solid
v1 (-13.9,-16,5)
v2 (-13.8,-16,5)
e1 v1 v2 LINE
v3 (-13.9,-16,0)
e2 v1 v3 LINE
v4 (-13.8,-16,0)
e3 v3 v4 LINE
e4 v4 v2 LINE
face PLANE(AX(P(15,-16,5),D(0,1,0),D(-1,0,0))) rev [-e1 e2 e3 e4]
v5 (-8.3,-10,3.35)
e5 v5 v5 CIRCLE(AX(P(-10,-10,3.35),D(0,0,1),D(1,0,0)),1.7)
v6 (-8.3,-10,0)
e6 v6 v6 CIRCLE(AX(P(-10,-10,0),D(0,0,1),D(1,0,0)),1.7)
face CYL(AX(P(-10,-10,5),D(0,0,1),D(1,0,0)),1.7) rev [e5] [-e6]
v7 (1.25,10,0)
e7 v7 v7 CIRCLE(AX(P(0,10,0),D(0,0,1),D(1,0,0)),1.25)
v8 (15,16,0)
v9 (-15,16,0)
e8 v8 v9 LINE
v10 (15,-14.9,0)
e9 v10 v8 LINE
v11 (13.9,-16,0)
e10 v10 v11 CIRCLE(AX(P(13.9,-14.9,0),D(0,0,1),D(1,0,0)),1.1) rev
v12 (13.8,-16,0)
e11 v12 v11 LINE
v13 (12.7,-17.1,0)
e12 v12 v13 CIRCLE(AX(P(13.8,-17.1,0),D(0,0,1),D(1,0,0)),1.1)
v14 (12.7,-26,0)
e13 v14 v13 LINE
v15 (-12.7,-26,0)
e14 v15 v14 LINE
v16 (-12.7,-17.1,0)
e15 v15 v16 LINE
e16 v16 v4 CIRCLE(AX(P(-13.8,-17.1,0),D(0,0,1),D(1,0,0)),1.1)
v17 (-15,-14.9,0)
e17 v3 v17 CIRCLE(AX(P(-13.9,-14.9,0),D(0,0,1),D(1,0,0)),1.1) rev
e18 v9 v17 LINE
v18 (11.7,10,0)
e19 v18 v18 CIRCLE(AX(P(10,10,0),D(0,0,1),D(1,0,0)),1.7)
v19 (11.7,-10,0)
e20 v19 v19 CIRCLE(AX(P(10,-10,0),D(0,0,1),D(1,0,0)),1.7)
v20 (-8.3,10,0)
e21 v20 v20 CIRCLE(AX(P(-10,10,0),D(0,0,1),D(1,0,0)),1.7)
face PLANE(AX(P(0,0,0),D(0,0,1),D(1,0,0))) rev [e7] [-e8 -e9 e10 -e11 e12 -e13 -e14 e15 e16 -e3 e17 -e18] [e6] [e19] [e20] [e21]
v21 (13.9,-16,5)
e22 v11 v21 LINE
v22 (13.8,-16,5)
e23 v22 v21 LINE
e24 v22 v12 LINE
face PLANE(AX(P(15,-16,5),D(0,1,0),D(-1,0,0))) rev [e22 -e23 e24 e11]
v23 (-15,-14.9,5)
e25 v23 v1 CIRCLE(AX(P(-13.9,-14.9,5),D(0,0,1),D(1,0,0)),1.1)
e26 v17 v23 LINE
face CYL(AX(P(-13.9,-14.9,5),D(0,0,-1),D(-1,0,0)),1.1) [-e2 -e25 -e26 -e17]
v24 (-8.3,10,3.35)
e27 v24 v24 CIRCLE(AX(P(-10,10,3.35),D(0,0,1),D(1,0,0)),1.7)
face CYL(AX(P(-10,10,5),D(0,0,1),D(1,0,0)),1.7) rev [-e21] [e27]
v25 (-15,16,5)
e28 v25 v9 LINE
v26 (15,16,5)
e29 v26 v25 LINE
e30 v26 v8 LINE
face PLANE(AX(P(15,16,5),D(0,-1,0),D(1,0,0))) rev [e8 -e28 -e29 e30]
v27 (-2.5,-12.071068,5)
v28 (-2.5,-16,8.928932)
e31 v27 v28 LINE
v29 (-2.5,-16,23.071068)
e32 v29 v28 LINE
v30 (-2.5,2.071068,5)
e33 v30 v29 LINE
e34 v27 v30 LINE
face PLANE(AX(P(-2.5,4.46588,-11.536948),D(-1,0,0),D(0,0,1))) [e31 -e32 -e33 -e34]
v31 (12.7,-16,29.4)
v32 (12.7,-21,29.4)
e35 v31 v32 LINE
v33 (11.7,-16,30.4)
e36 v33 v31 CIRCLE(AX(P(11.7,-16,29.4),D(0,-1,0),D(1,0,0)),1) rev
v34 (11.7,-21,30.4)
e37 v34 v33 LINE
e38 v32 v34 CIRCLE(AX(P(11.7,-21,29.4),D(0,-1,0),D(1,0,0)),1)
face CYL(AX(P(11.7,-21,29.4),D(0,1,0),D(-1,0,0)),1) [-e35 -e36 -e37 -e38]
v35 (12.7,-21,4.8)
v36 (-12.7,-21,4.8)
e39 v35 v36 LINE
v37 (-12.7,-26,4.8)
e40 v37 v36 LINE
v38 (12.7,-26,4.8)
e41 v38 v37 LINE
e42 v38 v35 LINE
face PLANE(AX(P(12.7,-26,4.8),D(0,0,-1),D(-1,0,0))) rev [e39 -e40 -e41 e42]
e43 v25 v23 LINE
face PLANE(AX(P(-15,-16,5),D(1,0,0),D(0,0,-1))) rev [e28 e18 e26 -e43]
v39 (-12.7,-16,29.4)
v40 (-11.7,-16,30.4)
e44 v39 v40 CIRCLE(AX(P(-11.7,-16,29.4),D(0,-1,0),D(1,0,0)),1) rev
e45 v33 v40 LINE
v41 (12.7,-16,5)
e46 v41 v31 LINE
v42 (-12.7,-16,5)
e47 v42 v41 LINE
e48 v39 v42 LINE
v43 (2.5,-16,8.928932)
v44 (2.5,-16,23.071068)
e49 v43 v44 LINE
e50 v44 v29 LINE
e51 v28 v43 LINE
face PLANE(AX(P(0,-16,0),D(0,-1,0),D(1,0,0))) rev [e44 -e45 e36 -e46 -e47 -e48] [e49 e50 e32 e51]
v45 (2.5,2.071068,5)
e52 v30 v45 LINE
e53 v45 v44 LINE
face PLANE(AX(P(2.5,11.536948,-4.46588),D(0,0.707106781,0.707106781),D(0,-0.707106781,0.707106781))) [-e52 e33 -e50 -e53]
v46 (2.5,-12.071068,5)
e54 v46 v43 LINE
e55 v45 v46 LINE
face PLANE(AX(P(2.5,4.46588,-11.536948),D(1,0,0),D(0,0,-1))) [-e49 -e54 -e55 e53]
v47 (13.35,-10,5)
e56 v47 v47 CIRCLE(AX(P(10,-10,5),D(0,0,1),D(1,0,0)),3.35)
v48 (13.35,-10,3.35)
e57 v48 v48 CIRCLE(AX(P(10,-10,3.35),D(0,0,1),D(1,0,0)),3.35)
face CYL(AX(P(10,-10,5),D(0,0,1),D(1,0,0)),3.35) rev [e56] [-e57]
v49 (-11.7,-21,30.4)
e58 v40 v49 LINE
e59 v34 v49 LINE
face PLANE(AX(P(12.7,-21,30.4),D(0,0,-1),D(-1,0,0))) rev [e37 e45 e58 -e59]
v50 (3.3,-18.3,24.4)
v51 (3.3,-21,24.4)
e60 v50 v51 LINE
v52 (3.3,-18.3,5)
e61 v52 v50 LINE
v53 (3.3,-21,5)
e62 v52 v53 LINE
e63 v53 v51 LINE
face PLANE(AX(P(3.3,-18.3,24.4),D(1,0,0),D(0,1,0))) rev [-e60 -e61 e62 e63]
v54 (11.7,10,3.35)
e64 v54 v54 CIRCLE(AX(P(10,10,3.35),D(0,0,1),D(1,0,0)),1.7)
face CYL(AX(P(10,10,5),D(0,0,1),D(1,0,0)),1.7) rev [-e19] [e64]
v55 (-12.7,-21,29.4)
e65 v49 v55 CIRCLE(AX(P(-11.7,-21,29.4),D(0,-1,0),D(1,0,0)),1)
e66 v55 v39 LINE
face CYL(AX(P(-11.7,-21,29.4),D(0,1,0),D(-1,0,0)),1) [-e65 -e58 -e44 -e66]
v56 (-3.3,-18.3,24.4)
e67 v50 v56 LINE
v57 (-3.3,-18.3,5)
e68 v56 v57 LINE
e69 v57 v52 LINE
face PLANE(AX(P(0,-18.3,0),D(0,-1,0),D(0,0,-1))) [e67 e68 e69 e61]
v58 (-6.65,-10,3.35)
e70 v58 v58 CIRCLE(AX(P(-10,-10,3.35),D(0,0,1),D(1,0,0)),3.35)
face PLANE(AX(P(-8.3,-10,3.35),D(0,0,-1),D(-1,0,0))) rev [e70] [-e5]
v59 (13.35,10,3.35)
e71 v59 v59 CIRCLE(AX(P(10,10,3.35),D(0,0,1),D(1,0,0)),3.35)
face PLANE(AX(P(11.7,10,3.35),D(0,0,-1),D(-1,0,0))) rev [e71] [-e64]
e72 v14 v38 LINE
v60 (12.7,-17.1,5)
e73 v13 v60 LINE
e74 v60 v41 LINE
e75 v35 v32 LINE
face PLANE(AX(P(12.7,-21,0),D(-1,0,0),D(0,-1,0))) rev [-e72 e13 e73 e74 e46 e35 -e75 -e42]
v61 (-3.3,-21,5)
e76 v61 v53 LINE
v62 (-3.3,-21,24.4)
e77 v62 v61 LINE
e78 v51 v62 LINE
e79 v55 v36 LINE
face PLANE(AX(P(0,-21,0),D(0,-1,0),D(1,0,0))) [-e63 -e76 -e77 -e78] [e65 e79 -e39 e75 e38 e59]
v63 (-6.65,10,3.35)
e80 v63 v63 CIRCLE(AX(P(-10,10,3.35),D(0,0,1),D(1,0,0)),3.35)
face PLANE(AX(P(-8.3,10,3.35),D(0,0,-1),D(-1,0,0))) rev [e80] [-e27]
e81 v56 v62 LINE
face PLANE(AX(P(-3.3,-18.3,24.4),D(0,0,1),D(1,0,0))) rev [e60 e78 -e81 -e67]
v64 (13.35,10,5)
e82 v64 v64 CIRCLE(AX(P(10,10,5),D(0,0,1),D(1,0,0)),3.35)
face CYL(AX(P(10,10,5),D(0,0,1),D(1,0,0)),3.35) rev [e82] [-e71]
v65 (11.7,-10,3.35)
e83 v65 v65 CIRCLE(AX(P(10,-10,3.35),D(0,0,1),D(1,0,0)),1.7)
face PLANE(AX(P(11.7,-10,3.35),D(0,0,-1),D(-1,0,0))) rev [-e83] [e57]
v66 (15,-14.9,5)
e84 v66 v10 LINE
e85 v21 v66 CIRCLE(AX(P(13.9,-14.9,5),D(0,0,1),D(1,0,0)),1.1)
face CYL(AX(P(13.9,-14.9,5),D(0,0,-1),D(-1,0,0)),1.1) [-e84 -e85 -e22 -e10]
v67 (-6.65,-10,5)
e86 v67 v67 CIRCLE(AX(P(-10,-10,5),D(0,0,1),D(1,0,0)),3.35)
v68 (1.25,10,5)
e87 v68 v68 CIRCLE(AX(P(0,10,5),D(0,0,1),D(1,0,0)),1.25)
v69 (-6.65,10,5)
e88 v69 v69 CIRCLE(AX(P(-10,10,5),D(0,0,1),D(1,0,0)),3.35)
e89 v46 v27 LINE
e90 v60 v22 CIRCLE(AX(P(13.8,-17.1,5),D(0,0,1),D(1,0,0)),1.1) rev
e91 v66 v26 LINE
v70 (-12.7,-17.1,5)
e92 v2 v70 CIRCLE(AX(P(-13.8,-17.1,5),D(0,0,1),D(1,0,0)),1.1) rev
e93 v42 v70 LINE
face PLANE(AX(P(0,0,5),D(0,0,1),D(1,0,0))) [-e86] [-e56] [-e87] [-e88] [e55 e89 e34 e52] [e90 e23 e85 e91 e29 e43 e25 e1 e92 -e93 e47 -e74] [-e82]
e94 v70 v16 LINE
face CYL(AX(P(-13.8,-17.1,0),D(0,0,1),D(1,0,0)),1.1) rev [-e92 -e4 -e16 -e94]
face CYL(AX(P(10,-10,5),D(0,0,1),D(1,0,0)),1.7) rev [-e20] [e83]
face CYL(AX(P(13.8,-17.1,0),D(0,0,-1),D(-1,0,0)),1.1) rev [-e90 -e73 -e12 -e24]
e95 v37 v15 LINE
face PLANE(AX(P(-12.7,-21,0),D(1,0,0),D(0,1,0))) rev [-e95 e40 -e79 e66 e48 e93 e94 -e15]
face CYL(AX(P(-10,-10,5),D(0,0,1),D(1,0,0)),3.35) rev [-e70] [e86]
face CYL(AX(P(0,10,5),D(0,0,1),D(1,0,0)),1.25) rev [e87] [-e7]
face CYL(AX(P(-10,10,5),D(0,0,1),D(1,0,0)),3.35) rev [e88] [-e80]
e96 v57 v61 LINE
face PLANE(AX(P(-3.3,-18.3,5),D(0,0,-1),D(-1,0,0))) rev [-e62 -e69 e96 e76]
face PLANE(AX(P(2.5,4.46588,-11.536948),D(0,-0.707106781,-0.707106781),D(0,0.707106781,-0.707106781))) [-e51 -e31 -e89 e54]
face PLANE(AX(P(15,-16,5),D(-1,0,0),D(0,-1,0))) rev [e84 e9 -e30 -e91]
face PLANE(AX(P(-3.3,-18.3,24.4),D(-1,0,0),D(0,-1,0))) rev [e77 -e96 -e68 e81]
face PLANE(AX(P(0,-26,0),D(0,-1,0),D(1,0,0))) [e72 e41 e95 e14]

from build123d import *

# Parameters (mm, degrees)
SKETCH1_W                       = 30
SKETCH1_H                       = 32
BOSS_EXTRUDE1_DEPTH             = 5
CBORE_FOR_M3_SBHCS2_D           = 3.4
CBORE_FOR_M3_SBHCS2_CBORE_D     = 6.7
CBORE_FOR_M3_SBHCS2_CBORE_DEPTH = 1.65
TAP_DRILL_FOR_M3X0_5_TAP1_D     = 2.5
SKETCH5_W                       = 25.4
SKETCH5_H                       = 30.4
BOSS_EXTRUDE2_DEPTH             = 5
BOSS_EXTRUDE3_REACH             = 38.377
SKETCH8_W                       = 5
SKETCH8_H                       = 10
BOSS_EXTRUDE3_DIRECTION_2_REACH = 38.377
SKETCH10_W                      = 6.6
SKETCH10_H                      = 19.4
CUT_EXTRUDE1_DEPTH              = 2.7
FILLET1_R                       = 1
SKETCH12_W                      = 25.4
SKETCH12_H                      = 4.8
BOSS_EXTRUDE5_DEPTH             = 5
FILLET2_START                   = -1
FILLET2_DEPTH                   = 30.4
FILLET2_2_DEPTH                 = 5


with BuildPart() as part:
    # Sketch1 → Boss-Extrude1 (new body)
    with BuildSketch(Plane.XY):
        Rectangle(SKETCH1_W, SKETCH1_H)
    extrude(amount=BOSS_EXTRUDE1_DEPTH)

    # CBORE for M3 SBHCS2 (through all)
    with Locations(Plane.XY.offset(5)):
        with Locations((-10, 10), (-10, -10), (10, -10), (10, 10)):
            CounterBoreHole(CBORE_FOR_M3_SBHCS2_D / 2, CBORE_FOR_M3_SBHCS2_CBORE_D / 2, CBORE_FOR_M3_SBHCS2_CBORE_DEPTH)

    # Tap Drill for M3x0.5 Tap1 (through all)
    with Locations(Plane.XY.offset(5)):
        with Locations((0, 10)):
            Hole(TAP_DRILL_FOR_M3X0_5_TAP1_D / 2)

    # Sketch5 → Boss-Extrude2 (add)
    with BuildSketch(Plane.XZ.offset(16)):
        with Locations((0, 15.2)):
            Rectangle(SKETCH5_W, SKETCH5_H)
    extrude(amount=BOSS_EXTRUDE2_DEPTH)

    # Boss-Extrude3: up to this plane
    boss_extrude3_end = Plane(origin=(0, -16, 0), z_dir=(0, -1, 0))
    # Sketch8 → Boss-Extrude3 (add, up to the surface)
    with BuildSketch(Plane(origin=(0, -10.5, 10.5), x_dir=(1, 0, 0), z_dir=(0, -0.7071067811865475, 0.7071067811865477)), mode=Mode.PRIVATE) as boss_extrude3_sk1:
        Rectangle(SKETCH8_W, SKETCH8_H)
    boss_extrude3_tool1 = split(extrude(boss_extrude3_sk1.sketch, amount=BOSS_EXTRUDE3_REACH, mode=Mode.PRIVATE), bisect_by=boss_extrude3_end, keep=Keep.BOTH, mode=Mode.PRIVATE)
    add(boss_extrude3_tool1.solids().sort_by_distance((0, -10.5, 10.5))[0])

    # Boss-Extrude3 direction 2: up to this plane
    boss_extrude3_direction_2_end = Plane(origin=(0, 0, 5), z_dir=(0, 0, 1))
    # Sketch8 → Boss-Extrude3 direction 2 (add, up to the surface)
    with BuildSketch(Plane(origin=(0, -10.5, 10.5), x_dir=(1, 0, 0), z_dir=(0, -0.7071067811865475, 0.7071067811865477)), mode=Mode.PRIVATE) as boss_extrude3_direction_2_sk1:
        Rectangle(SKETCH8_W, SKETCH8_H)
    boss_extrude3_direction_2_tool1 = split(extrude(boss_extrude3_direction_2_sk1.sketch, amount=-BOSS_EXTRUDE3_DIRECTION_2_REACH, mode=Mode.PRIVATE), bisect_by=boss_extrude3_direction_2_end, keep=Keep.BOTH, mode=Mode.PRIVATE)
    add(boss_extrude3_direction_2_tool1.solids().sort_by_distance((0, -10.5, 10.5))[0])

    # Sketch10 → Cut-Extrude1 (cut)
    with BuildSketch(Plane.XZ.offset(21)):
        with Locations((0, 14.7)):
            Rectangle(SKETCH10_W, SKETCH10_H)
    extrude(amount=-CUT_EXTRUDE1_DEPTH, mode=Mode.SUBTRACT)

    # Fillet1
    fillet1_edges = [part.edges().sort_by_distance(p)[0] for p in [
        (12.7, -18.5, 30.4),
        (-12.7, -18.5, 30.4),
    ]]
    fillet(fillet1_edges, radius=FILLET1_R)

    # Sketch12 → Boss-Extrude5 (add)
    with BuildSketch(Plane.XZ.offset(21)):
        with Locations((0, 2.4)):
            Rectangle(SKETCH12_W, SKETCH12_H)
    extrude(amount=BOSS_EXTRUDE5_DEPTH)

    # Fillet2: read off the stored shape, not the designer's step
    # Fillet2 outline → Fillet2 (cut)
    with BuildSketch(Plane.XY.offset(FILLET2_START)):
        with BuildLine():
            Line((15, -16), (15, -14.9))
            ThreePointArc((15, -14.9), (14.677817459, -15.677817459), (13.9, -16))
            Line((13.9, -16), (15, -16))
        make_face()
        with BuildLine():
            Line((-15, -16), (-13.9, -16))
            ThreePointArc((-13.9, -16), (-14.677817459, -15.677817459), (-15, -14.9))
            Line((-15, -14.9), (-15, -16))
        make_face()
    extrude(amount=FILLET2_DEPTH, mode=Mode.SUBTRACT)

    # Fillet2 2 outline → Fillet2 2 (add)
    with BuildSketch(Plane.XY):
        with BuildLine():
            ThreePointArc((12.7, -17.1), (13.022182541, -16.322182541), (13.8, -16))
            Line((13.8, -16), (12.7, -16))
            Line((12.7, -16), (12.7, -17.1))
        make_face()
        with BuildLine():
            Line((-12.7, -16), (-13.8, -16))
            ThreePointArc((-13.8, -16), (-13.022182541, -16.322182541), (-12.7, -17.1))
            Line((-12.7, -17.1), (-12.7, -16))
        make_face()
    extrude(amount=FILLET2_2_DEPTH)


solid = part.part
